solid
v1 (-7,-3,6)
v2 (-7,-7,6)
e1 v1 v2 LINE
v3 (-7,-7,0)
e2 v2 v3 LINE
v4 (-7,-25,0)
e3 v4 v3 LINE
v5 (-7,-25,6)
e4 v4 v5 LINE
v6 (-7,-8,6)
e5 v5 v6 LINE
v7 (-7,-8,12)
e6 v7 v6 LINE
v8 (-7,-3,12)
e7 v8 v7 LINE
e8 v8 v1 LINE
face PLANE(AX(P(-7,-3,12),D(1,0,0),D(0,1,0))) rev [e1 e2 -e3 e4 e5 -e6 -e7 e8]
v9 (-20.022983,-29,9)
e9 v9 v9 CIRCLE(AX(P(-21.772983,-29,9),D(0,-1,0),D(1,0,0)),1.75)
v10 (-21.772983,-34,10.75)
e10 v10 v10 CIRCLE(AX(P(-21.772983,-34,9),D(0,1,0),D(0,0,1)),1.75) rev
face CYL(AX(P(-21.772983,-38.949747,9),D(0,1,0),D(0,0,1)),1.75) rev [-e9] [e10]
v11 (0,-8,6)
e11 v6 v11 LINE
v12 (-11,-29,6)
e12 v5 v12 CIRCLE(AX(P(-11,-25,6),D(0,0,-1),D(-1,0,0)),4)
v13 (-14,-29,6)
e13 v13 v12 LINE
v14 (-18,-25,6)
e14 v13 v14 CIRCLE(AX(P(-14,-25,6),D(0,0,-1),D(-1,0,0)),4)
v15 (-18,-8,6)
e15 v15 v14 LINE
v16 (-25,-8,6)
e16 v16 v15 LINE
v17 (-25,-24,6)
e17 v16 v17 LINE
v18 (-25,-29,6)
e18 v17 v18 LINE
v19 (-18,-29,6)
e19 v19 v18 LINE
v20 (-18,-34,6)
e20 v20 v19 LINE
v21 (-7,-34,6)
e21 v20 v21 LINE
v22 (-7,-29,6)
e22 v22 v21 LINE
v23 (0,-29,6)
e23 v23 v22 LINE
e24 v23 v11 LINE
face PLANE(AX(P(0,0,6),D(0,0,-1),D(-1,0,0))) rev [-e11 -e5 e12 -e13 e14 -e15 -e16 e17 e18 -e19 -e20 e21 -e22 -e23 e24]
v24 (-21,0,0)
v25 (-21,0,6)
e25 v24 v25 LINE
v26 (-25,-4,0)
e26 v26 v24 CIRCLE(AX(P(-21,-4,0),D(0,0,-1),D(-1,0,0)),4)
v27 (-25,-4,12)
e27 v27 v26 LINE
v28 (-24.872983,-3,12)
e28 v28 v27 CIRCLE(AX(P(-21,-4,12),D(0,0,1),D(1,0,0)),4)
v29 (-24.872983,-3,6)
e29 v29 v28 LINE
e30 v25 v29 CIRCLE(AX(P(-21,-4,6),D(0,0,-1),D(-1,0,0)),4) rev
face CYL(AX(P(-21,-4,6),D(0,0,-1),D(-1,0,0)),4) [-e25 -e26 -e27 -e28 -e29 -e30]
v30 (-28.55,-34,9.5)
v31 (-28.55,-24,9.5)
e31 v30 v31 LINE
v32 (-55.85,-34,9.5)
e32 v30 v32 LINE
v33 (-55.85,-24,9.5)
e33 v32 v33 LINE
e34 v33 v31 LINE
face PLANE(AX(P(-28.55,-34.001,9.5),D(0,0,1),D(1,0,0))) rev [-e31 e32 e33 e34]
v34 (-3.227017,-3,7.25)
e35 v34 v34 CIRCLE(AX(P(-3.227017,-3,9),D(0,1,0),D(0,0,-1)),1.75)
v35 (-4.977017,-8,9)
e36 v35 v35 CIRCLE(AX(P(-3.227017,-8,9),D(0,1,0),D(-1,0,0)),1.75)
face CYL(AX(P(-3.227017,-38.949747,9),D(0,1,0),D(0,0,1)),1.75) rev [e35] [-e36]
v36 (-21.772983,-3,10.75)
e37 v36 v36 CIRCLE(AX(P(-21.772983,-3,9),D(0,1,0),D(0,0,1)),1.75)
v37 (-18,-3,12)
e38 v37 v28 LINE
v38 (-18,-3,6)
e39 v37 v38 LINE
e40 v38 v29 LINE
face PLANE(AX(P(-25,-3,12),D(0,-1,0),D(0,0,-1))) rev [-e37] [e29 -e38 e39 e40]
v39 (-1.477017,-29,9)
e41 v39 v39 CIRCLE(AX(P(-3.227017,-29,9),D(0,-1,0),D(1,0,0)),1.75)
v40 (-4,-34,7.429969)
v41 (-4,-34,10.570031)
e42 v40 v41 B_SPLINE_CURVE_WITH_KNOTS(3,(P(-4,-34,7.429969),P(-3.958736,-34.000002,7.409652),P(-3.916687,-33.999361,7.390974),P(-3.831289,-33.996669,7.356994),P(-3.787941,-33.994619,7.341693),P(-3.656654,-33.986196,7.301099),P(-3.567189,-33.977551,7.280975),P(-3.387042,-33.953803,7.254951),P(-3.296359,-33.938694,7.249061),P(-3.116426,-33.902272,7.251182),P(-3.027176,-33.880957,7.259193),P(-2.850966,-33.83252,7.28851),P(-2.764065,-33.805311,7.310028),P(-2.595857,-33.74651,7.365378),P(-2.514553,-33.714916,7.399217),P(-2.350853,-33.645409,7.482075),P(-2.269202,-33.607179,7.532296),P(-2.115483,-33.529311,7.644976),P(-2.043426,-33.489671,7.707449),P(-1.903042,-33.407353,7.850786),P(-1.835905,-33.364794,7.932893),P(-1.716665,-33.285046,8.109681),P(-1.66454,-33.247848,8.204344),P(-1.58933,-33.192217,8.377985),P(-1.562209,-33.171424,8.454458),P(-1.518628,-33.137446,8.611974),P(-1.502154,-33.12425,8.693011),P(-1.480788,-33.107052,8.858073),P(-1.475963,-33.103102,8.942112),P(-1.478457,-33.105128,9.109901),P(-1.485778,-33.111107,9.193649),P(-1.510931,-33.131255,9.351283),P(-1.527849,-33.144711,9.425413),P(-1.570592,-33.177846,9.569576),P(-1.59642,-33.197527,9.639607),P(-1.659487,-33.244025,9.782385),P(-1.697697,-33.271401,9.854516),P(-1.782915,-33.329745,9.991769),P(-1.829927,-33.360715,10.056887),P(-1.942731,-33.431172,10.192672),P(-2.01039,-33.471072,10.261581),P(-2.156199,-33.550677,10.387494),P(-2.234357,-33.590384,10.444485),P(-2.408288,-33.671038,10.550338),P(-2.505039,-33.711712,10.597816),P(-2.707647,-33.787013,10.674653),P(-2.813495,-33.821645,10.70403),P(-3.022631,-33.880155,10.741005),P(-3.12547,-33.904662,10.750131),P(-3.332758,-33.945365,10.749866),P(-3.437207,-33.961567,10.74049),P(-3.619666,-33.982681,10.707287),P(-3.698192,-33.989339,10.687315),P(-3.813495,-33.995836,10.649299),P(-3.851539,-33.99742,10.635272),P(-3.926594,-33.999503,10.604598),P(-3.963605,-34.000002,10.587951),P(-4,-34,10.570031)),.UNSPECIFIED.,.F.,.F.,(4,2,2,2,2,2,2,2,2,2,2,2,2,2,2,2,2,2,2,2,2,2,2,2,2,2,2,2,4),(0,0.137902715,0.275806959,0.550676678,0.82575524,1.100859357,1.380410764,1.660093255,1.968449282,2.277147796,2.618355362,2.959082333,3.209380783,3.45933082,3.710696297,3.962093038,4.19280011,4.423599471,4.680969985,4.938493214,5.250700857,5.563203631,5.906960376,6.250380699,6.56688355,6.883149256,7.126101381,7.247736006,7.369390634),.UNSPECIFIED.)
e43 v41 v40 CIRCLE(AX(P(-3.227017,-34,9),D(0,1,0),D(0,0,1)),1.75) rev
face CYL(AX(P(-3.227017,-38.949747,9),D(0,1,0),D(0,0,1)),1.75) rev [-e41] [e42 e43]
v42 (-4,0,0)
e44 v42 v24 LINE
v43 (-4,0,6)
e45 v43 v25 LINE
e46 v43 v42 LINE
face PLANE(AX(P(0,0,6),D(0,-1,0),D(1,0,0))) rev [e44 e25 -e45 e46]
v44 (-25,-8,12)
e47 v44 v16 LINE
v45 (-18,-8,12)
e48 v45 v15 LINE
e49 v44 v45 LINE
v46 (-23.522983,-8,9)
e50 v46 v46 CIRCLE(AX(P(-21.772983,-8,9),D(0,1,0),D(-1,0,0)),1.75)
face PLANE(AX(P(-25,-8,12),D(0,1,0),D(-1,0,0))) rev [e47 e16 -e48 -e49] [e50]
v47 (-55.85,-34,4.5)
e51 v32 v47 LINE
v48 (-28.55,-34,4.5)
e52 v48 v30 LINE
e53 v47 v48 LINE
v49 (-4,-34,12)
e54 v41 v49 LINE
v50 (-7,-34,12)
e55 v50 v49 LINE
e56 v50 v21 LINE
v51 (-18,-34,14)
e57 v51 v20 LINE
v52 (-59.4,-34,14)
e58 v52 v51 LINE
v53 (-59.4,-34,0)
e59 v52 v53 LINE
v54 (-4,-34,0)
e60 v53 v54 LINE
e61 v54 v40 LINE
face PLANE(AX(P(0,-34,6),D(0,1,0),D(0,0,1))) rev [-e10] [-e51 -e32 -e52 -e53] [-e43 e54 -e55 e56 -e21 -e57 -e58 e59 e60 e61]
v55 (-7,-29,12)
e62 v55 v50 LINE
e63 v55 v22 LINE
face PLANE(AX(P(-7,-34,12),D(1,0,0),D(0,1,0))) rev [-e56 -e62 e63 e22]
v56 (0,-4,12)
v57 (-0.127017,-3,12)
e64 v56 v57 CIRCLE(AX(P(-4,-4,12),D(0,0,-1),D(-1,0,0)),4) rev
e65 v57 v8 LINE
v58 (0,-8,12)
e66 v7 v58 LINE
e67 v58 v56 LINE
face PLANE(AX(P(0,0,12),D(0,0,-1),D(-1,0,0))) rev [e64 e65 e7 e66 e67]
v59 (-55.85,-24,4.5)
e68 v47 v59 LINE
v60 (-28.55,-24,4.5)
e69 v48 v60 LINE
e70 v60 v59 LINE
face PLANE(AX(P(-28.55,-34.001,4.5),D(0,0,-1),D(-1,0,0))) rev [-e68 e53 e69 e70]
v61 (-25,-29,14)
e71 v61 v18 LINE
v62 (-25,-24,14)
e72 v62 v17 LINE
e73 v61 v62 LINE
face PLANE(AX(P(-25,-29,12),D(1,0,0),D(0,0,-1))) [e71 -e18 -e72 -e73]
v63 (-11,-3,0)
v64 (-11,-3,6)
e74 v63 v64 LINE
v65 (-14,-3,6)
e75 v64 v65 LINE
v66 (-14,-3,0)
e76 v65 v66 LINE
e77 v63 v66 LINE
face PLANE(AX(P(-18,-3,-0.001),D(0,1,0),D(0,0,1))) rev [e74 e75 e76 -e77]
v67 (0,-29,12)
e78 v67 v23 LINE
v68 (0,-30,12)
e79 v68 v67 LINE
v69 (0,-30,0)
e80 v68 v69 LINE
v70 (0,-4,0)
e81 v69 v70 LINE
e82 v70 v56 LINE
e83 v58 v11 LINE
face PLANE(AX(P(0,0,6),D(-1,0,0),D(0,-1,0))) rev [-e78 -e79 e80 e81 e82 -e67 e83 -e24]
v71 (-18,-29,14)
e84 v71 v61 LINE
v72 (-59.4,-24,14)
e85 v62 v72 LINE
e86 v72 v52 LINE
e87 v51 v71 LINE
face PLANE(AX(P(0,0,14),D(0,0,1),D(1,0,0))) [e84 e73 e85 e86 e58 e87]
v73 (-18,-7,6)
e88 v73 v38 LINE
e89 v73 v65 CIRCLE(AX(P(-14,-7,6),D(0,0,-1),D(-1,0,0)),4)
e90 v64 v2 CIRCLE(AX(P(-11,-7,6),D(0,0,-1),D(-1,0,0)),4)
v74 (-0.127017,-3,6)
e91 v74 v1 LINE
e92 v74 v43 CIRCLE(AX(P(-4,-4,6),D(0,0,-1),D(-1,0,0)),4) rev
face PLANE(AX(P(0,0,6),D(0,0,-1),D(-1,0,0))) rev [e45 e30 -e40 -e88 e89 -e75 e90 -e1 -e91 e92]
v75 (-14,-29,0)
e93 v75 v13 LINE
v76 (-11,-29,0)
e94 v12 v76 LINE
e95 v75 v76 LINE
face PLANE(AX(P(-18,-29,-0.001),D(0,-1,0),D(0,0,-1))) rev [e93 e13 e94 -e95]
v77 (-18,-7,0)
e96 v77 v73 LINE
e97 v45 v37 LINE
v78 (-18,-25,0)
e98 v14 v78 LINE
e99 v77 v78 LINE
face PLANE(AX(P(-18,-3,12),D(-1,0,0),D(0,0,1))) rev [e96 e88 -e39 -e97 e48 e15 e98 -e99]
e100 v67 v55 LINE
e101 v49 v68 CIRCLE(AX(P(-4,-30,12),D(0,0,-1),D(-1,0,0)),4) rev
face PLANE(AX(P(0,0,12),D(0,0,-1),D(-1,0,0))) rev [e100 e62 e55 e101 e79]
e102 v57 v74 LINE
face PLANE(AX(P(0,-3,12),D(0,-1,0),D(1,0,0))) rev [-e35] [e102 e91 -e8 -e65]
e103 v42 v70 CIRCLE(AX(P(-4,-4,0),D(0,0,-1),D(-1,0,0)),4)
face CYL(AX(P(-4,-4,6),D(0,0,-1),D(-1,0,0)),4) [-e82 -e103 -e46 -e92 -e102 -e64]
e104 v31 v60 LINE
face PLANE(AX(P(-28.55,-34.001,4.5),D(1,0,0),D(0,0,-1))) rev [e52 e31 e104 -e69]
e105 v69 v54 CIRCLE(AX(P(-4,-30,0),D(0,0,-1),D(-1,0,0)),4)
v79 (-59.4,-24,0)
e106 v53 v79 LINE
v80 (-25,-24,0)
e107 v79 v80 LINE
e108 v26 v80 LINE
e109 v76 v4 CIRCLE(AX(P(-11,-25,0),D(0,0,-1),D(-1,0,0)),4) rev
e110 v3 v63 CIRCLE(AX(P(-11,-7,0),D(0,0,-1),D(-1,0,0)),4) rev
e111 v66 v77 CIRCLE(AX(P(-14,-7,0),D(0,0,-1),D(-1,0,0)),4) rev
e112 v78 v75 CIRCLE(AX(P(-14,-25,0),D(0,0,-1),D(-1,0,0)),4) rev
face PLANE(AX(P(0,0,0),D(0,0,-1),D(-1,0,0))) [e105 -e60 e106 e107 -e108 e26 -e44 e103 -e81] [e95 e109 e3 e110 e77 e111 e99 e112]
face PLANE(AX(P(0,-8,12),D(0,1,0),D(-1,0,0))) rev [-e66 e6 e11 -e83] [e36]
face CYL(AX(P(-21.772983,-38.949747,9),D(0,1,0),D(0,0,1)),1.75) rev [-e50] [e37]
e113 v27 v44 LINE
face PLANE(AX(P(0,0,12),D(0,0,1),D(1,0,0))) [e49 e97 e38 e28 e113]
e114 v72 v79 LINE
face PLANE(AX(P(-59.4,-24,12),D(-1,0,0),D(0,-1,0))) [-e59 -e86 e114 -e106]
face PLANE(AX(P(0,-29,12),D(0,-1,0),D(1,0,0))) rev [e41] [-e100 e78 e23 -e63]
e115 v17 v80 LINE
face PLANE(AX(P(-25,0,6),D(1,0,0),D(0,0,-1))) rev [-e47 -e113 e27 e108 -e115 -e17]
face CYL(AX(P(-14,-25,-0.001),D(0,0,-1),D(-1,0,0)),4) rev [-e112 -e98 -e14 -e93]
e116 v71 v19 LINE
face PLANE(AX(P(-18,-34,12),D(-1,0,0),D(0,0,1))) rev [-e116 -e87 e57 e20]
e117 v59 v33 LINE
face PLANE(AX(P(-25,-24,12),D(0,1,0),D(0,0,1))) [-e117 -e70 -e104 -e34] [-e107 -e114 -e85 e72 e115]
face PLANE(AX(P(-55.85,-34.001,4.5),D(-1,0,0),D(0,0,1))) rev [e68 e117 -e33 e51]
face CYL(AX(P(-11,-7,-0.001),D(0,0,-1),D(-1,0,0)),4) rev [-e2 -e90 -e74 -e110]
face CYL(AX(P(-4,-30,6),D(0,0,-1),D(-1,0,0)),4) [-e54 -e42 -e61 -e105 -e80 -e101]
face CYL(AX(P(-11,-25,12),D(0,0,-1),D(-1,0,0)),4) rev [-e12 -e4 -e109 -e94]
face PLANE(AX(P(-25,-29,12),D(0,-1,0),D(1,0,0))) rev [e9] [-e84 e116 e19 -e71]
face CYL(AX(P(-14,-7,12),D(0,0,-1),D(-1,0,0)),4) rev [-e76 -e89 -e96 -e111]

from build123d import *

# Parameters (mm, degrees)
CROQUIS1_W              = 25
CROQUIS1_H              = 34
SALIENTE_EXTRUIR1_DEPTH = 6
CROQUIS2_W              = 7
CROQUIS2_H              = 5
SALIENTE_EXTRUIR2_DEPTH = 6
CORTAR_EXTRUIR1_REACH   = 44.626
CROQUIS3_W              = 11
CROQUIS3_H              = 26
REDONDEO1_R             = 4
SALIENTE_EXTRUIR3_DEPTH = 12
SALIENTE_EXTRUIR4_DEPTH = 2
CORTAR_EXTRUIR2_REACH   = 70.45
CROQUIS7_R              = 1.75
CORTAR_EXTRUIR3_REACH   = 67.577
CROQUIS8_W              = 27.3
CROQUIS8_H              = 5


with BuildPart() as part:
    # Croquis1 → Saliente-Extruir1 (new body)
    with BuildSketch(Plane.XY):
        with Locations((-12.5, -17)):
            Rectangle(CROQUIS1_W, CROQUIS1_H)
    extrude(amount=SALIENTE_EXTRUIR1_DEPTH)

    # Croquis2 → Saliente-Extruir2 (add)
    with BuildSketch(Plane.XY.offset(6)):
        with Locations((-21.5, -5.5)):
            Rectangle(CROQUIS2_W, CROQUIS2_H)
        with Locations((-3.5, -5.5)):
            Rectangle(CROQUIS2_W, CROQUIS2_H)
        with Locations((-3.5, -31.5)):
            Rectangle(CROQUIS2_W, CROQUIS2_H)
        with Locations((-21.5, -31.5)):
            Rectangle(CROQUIS2_W, CROQUIS2_H)
    extrude(amount=SALIENTE_EXTRUIR2_DEPTH)

    # Croquis3 → Cortar-Extruir1 (cut, up to next)
    with BuildSketch(Plane.XY.offset(6), mode=Mode.PRIVATE) as cortar_extruir1_sk1:
        with Locations((-12.5, -16)):
            Rectangle(CROQUIS3_W, CROQUIS3_H)
    cortar_extruir1_tool1 = extrude(cortar_extruir1_sk1.sketch, amount=-CORTAR_EXTRUIR1_REACH, mode=Mode.PRIVATE) & part.part
    add(cortar_extruir1_tool1.solids().sort_by_distance((-12.5, -16, 6))[0], mode=Mode.SUBTRACT)

    # Redondeo1
    # the kernel refuses this fillet: 4 mm, written as the material it adds along each edge
    with BuildSketch(Plane(origin=(-18, -29, 6), x_dir=(0, 1, 0), z_dir=(0, 0, -1)), Plane(origin=(-7, -29, 6), x_dir=(-1, 0, 0), z_dir=(0, 0, -1)), Plane(origin=(-18, -3, 6), x_dir=(1, 0, 0), z_dir=(0, 0, -1))) as redondeo1_piece_1:
        with BuildLine():
            CenterArc((REDONDEO1_R, REDONDEO1_R), REDONDEO1_R, 180, 90)
            Line((0, REDONDEO1_R), (0, 0))
            Line((0, 0), (REDONDEO1_R, 0))
        make_face()
    extrude(amount=6)
    with BuildSketch(Plane(origin=(-7, -3, 6), x_dir=(-1, 0, 0), z_dir=(0, 0, -1))) as redondeo1_piece_2:
        with BuildLine():
            CenterArc((REDONDEO1_R, -REDONDEO1_R), REDONDEO1_R, 90, 90)
            Line((0, -REDONDEO1_R), (0, 0))
            Line((0, 0), (REDONDEO1_R, 0))
        make_face()
    extrude(amount=6)
    # the kernel refuses this fillet: 4 mm, written as the material it takes off along each edge
    with BuildSketch(Plane(origin=(0, 0, -10), x_dir=(-1, 0, 0), z_dir=(0, 0, 1))) as redondeo1_2_piece_1:
        with BuildLine():
            CenterArc((REDONDEO1_R, REDONDEO1_R), REDONDEO1_R, 180, 90)
            Line((0, REDONDEO1_R), (0, 0))
            Line((0, 0), (REDONDEO1_R, 0))
        make_face()
    extrude(amount=26, mode=Mode.SUBTRACT)
    with BuildSketch(Plane(origin=(0, -34, 22), x_dir=(0, 1, 0), z_dir=(0, 0, -1)), Plane(origin=(-25, -34, -10), x_dir=(0, 1, 0), z_dir=(0, 0, 1))) as redondeo1_2_piece_2:
        with BuildLine():
            CenterArc((REDONDEO1_R, -REDONDEO1_R), REDONDEO1_R, 90, 90)
            Line((0, -REDONDEO1_R), (0, 0))
            Line((0, 0), (REDONDEO1_R, 0))
        make_face()
    extrude(amount=32, mode=Mode.SUBTRACT)
    with BuildSketch(Plane(origin=(-25, 0, -10), x_dir=(1, 0, 0), z_dir=(0, 0, 1))) as redondeo1_2_piece_3:
        with BuildLine():
            CenterArc((REDONDEO1_R, -REDONDEO1_R), REDONDEO1_R, 90, 90)
            Line((0, -REDONDEO1_R), (0, 0))
            Line((0, 0), (REDONDEO1_R, 0))
        make_face()
    extrude(amount=26, mode=Mode.SUBTRACT)

    # Croquis5 → Saliente-Extruir3 (add)
    with BuildSketch(Plane(origin=(0, 0, 0), x_dir=(-1, 0, 0), z_dir=(0, 0, -1))):
        with BuildLine():
            Line((25, -29), (25, -30))
            ThreePointArc((25, -30), (23.828427125, -32.828427125), (21, -34))
            Line((21, -34), (25, -34))
            Line((25, -34), (59.4, -34))
            Line((59.4, -34), (59.4, -24))
            Line((59.4, -24), (25, -24))
            Line((25, -24), (25, -29))
        make_face()
    extrude(amount=-SALIENTE_EXTRUIR3_DEPTH)

    # Croquis6 → Saliente-Extruir4 (add)
    with BuildSketch(Plane.XY.offset(12)):
        Polygon((-18, -29), (-25, -29), (-25, -24), (-59.4, -24), (-59.4, -34), (-18, -34), align=None)
    extrude(amount=SALIENTE_EXTRUIR4_DEPTH)

    # Cortar-Extruir2: up to this face of the body (flat: up to its plane)
    cortar_extruir2_end = Plane(part.part.faces().sort_by_distance((-34.409507042, -34, 6.559859155))[0])
    # Croquis7 → Cortar-Extruir2 (cut, up to the picked face)
    with BuildSketch(Plane(origin=(0, -3, 0), x_dir=(1, 0, 0), z_dir=(0, 1, 0)), mode=Mode.PRIVATE) as cortar_extruir2_sk1:
        with Locations(Location((-21.772983346, -9, 0), (0, 0, 270))):
            Circle(CROQUIS7_R)
    cortar_extruir2_tool1 = split(extrude(cortar_extruir2_sk1.sketch, amount=-CORTAR_EXTRUIR2_REACH, mode=Mode.PRIVATE), bisect_by=cortar_extruir2_end, keep=Keep.BOTH, mode=Mode.PRIVATE)
    # Croquis7 → Cortar-Extruir2 (cut, up to the picked face)
    with BuildSketch(Plane(origin=(0, -3, 0), x_dir=(1, 0, 0), z_dir=(0, 1, 0)), mode=Mode.PRIVATE) as cortar_extruir2_sk2:
        with Locations(Location((-3.227016654, -9, 0), (0, 0, 243.787297197))):
            Circle(CROQUIS7_R)
    cortar_extruir2_tool2 = split(extrude(cortar_extruir2_sk2.sketch, amount=-CORTAR_EXTRUIR2_REACH, mode=Mode.PRIVATE), bisect_by=cortar_extruir2_end, keep=Keep.BOTH, mode=Mode.PRIVATE)
    add(cortar_extruir2_tool1.solids().sort_by(Axis((-21.772983, -3, 9), (0, -1, 0)))[0], mode=Mode.SUBTRACT)
    add(cortar_extruir2_tool2.solids().sort_by(Axis((-3.227017, -3, 9), (0, -1, 0)))[0], mode=Mode.SUBTRACT)

    # Croquis8 → Cortar-Extruir3 (cut, up to next)
    with BuildSketch(Plane(origin=(0, -24, 0), x_dir=(1, 0, 0), z_dir=(0, 1, 0)), mode=Mode.PRIVATE) as cortar_extruir3_sk1:
        with Locations((-42.2, -7)):
            Rectangle(CROQUIS8_W, CROQUIS8_H)
    cortar_extruir3_tool1 = extrude(cortar_extruir3_sk1.sketch, amount=-CORTAR_EXTRUIR3_REACH, mode=Mode.PRIVATE) & part.part
    add(cortar_extruir3_tool1.solids().sort_by_distance((-42.2, -24, 7))[0], mode=Mode.SUBTRACT)


solid = part.part
